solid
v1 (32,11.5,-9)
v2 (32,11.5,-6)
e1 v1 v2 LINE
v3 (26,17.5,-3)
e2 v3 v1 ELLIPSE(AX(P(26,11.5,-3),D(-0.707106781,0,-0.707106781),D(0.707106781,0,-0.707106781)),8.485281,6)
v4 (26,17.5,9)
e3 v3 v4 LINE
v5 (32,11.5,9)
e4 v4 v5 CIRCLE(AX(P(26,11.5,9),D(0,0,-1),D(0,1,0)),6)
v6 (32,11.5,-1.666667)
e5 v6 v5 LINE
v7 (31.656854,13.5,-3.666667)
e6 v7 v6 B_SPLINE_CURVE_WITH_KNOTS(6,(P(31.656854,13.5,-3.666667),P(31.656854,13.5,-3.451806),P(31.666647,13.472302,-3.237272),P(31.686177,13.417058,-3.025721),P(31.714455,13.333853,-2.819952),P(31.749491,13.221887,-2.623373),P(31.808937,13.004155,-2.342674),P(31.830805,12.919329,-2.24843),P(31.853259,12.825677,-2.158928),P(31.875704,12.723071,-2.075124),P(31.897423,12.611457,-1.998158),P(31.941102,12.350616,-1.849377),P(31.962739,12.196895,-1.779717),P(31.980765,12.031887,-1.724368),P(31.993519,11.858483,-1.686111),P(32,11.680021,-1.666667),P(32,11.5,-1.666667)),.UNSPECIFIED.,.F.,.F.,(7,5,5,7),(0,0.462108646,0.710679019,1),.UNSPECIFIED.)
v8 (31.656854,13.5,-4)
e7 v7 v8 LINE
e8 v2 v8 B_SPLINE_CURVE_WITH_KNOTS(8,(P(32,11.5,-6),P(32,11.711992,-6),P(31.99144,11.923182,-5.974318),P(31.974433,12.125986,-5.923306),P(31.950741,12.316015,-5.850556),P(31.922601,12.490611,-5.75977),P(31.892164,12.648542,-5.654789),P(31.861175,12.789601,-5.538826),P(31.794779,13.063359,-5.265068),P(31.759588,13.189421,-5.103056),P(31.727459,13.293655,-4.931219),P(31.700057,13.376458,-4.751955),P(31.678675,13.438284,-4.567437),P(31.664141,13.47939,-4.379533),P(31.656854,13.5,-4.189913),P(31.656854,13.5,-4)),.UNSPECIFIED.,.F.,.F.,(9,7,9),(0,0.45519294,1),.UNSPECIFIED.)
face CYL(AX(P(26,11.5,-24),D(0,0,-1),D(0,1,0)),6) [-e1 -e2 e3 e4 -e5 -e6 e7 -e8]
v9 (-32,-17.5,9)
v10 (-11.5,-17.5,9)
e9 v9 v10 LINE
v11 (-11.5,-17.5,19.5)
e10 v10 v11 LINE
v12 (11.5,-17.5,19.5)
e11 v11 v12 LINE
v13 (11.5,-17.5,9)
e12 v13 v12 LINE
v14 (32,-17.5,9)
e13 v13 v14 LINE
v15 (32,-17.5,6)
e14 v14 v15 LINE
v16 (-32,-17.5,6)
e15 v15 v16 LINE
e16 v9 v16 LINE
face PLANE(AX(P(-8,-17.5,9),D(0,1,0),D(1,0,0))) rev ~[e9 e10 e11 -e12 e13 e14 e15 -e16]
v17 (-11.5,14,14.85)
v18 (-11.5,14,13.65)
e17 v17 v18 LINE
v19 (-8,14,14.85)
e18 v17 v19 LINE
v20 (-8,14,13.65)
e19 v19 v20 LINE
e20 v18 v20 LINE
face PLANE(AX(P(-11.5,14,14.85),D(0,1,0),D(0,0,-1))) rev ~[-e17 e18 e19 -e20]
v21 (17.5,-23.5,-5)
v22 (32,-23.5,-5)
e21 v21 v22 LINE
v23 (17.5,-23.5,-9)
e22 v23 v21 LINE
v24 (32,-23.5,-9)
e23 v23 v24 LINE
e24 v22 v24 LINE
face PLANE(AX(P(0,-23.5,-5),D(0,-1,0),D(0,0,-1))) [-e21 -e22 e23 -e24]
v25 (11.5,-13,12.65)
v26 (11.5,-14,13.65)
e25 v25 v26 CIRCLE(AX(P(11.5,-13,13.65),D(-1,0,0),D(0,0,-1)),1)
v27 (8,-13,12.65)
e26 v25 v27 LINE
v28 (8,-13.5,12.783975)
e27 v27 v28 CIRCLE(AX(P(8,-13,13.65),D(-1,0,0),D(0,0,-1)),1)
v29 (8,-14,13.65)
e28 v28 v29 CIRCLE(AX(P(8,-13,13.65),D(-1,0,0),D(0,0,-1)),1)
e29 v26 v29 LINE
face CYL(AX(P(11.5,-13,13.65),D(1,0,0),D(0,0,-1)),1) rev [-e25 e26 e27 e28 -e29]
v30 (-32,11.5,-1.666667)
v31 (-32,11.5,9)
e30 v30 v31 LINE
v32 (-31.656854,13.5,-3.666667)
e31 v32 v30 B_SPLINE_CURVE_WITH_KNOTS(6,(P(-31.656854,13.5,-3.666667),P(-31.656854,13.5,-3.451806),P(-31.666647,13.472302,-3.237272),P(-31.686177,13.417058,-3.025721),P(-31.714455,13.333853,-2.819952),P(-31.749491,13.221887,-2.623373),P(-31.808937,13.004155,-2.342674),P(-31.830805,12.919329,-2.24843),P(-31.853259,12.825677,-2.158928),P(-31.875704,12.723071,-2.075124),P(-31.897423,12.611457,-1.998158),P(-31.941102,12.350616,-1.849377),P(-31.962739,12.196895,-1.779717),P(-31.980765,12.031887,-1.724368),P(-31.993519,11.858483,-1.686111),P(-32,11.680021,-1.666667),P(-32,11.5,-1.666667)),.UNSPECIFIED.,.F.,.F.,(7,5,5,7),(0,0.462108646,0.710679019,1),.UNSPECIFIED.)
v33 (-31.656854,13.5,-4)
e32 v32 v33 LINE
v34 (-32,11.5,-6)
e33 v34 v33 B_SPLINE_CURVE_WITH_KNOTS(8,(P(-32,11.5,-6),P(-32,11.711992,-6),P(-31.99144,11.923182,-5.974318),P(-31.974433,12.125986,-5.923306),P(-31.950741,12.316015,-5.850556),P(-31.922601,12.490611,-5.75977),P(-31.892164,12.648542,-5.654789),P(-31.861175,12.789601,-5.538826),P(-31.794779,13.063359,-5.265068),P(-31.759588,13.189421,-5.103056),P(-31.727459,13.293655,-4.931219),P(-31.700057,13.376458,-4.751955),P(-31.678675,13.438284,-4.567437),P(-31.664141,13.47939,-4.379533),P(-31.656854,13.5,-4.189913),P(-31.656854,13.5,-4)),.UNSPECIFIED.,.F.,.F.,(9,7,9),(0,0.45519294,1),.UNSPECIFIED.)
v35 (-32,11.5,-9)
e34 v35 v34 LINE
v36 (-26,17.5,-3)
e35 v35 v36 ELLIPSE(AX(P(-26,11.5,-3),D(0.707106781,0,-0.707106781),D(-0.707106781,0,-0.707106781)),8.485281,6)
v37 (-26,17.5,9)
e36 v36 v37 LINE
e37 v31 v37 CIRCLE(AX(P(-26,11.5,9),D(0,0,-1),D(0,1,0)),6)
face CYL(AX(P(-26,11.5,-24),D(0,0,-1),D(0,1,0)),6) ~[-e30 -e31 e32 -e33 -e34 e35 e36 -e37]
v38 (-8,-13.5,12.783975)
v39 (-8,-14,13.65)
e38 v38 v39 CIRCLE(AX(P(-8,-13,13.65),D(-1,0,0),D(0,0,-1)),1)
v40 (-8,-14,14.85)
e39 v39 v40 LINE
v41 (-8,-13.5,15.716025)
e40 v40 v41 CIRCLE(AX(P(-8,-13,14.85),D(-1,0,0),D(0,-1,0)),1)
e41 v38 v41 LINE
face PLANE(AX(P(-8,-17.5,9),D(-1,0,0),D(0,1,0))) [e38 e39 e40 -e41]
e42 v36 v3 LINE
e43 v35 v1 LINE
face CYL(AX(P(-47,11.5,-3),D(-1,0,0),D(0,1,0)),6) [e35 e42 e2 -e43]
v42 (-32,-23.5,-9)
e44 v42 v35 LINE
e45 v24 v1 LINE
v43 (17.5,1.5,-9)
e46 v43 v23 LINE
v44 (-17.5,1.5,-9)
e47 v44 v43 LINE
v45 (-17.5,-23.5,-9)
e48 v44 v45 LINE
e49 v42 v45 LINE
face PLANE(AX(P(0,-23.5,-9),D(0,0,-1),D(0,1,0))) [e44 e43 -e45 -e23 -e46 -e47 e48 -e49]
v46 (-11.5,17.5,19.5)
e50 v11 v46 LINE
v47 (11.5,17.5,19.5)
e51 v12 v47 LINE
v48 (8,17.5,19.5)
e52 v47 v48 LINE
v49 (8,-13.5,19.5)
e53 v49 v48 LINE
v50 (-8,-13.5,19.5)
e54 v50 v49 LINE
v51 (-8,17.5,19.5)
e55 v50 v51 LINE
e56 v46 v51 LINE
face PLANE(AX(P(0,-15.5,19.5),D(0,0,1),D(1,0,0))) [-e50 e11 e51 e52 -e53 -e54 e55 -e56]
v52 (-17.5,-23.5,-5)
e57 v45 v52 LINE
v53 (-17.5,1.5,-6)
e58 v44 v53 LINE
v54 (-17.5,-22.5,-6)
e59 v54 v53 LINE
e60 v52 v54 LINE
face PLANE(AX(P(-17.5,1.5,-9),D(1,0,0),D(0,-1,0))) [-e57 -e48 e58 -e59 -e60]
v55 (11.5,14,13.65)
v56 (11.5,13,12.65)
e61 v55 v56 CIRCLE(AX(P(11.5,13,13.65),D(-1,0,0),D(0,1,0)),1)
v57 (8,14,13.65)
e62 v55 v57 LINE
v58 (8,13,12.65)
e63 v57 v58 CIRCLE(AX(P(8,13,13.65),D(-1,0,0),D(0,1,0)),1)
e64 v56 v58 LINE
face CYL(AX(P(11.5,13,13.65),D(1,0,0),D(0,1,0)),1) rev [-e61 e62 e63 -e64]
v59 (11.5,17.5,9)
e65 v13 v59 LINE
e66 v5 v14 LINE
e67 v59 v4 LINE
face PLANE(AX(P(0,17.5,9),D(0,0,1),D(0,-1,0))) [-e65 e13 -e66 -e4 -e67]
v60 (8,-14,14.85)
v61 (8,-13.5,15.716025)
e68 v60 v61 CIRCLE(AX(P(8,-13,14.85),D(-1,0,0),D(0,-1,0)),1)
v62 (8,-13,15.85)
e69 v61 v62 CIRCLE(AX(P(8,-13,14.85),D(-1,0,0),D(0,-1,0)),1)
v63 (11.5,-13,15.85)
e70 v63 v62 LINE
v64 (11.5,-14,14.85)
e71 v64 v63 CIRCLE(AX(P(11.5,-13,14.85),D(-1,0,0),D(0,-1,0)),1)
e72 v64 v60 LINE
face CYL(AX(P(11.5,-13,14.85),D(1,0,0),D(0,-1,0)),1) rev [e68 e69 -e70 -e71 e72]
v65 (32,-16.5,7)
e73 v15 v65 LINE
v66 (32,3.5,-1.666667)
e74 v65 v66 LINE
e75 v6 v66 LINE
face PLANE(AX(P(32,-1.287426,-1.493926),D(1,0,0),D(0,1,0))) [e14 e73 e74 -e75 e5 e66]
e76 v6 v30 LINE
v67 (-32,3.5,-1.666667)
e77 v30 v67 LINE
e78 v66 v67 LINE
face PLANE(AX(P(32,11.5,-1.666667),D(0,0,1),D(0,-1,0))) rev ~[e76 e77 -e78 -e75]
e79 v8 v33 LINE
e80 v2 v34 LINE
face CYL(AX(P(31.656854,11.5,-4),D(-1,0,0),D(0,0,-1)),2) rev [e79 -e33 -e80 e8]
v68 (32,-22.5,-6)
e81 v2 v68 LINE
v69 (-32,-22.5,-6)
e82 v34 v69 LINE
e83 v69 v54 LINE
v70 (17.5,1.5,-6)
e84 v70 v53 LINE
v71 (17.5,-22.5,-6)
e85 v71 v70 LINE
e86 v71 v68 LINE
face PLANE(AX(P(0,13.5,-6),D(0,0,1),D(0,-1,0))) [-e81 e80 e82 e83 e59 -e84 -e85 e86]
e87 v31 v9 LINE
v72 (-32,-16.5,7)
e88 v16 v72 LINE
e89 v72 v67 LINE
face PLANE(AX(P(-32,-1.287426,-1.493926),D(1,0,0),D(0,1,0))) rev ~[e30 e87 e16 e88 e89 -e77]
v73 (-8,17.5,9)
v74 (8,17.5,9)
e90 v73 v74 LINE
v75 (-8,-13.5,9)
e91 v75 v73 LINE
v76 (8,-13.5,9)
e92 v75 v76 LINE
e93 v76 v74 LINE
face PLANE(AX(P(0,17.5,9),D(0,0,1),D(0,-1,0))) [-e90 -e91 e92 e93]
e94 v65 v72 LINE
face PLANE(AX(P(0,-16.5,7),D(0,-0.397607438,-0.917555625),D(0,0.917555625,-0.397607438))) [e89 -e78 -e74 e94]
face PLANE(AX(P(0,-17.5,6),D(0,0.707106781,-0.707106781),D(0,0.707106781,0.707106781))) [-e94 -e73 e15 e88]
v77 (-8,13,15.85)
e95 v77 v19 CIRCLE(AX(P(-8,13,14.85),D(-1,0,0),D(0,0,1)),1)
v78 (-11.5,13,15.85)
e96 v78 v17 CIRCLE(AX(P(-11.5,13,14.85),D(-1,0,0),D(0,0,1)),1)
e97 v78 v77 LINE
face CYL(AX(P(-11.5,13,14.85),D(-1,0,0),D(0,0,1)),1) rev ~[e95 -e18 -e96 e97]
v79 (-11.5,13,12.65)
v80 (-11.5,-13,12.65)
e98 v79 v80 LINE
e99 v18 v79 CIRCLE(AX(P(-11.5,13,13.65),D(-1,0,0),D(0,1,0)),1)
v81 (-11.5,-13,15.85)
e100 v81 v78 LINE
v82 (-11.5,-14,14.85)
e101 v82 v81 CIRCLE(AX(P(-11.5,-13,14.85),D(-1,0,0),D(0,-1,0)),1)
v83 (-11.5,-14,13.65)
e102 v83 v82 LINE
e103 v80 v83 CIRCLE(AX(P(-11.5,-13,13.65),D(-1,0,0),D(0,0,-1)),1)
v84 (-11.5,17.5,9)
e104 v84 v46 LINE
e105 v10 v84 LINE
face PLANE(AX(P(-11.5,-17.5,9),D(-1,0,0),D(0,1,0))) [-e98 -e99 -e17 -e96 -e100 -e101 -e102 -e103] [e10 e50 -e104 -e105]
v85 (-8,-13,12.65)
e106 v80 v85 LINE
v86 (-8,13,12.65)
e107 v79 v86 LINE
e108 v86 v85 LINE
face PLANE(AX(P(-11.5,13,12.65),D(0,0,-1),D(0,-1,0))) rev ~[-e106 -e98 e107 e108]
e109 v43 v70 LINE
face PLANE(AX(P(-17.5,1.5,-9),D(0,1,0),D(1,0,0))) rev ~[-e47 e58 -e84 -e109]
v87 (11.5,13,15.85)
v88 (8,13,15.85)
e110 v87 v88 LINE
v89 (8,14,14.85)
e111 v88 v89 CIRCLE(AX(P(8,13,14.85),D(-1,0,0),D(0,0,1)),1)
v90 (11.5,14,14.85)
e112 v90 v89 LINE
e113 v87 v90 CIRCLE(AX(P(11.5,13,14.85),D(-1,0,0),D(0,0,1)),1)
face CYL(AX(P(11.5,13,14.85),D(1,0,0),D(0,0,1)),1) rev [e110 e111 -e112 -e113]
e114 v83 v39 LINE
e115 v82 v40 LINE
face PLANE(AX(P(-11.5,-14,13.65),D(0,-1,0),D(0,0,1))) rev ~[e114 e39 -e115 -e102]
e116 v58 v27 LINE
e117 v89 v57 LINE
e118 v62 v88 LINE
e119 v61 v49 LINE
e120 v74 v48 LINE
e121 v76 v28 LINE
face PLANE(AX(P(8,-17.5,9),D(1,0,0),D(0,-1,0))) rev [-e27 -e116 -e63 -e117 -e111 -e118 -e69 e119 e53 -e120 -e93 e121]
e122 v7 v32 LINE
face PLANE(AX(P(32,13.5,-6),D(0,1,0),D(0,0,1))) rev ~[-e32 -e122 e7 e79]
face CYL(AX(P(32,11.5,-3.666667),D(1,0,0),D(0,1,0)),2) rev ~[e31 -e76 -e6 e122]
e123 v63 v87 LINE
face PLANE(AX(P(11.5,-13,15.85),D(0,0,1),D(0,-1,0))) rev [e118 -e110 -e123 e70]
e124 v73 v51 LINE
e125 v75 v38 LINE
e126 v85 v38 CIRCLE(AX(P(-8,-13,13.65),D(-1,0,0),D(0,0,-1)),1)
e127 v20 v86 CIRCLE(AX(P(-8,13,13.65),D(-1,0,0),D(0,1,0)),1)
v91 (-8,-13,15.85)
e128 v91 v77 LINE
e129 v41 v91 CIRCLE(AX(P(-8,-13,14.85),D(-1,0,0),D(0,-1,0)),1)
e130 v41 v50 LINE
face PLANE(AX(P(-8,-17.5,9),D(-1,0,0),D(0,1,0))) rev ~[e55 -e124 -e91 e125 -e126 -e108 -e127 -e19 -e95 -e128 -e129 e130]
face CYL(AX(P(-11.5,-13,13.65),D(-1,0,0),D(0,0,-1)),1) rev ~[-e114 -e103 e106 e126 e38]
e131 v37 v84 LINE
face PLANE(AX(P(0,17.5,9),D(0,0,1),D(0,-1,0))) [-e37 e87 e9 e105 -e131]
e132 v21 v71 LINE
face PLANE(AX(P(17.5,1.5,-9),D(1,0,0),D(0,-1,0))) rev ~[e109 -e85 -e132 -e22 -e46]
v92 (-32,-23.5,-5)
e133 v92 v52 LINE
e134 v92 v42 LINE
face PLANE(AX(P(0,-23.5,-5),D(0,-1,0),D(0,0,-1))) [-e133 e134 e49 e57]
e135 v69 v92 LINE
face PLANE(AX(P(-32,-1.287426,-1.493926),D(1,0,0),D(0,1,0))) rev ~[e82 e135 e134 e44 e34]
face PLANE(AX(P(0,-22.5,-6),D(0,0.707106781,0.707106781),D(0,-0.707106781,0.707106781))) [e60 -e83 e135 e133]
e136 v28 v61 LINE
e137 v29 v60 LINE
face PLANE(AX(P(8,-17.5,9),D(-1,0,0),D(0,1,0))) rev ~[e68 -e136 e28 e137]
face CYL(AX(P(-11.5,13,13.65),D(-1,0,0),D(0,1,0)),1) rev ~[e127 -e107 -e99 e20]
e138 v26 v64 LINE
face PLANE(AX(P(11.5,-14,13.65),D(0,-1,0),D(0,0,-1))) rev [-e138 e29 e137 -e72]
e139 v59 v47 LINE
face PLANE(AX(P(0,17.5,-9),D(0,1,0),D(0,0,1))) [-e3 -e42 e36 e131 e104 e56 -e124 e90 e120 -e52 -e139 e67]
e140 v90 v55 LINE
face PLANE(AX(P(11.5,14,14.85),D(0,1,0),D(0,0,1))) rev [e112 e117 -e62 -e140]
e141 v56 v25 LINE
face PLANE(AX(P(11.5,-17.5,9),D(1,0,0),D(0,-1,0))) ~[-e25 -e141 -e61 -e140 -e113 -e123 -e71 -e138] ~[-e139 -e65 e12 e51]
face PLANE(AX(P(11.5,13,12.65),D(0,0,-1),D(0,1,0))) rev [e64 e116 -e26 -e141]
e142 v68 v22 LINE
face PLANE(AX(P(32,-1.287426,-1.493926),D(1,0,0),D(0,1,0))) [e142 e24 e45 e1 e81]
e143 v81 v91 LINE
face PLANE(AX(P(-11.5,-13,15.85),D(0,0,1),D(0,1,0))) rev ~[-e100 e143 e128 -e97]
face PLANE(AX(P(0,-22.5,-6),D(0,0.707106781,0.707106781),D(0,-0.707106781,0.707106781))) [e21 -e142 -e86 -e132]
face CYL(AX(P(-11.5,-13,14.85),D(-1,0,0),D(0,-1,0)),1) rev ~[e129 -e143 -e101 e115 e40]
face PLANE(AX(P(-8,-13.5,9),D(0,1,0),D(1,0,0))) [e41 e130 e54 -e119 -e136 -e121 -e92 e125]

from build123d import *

# Parameters (mm, degrees)
F1_DEPTH     = 32
F3_DEPTH     = 64
F4_W         = 3.5
F4_H         = 35
F5_DEPTH     = 10.5
F7_DEPTH     = 3.5
F8_W         = 16
F8_H         = 4
F9_DEPTH     = 10.5
F10_T1_DEPTH = 48
F10_T3_DEPTH = 94
F11_W        = 35
F11_H        = 25
F12_DEPTH    = 4.001
F13_R        = 2


# Not quite as in the source:
# - a fillet or chamfer that OpenCascade refuses, or shapes differently, is made with other operations: its cross-section is extruded or revolved along the edge and cut away or added
# - a pattern or mirror of a feature is missing from the dataset's text; its kind, count and spacing are read off the source's solid


with BuildPart() as f1:
    # F0 (on Right) → F1 (new body, symmetric)
    with BuildSketch(Plane.YZ):
        Polygon((13.5, -6), (-22.5, -6), (-23.5, -5), (-23.5, -9), (17.5, -9), (17.5, 9), (-17.5, 9), (-17.5, 6), (-16.5, 7), align=None)
    extrude(amount=F1_DEPTH, both=True)

    # F2 (on face) → F3 (cut, through all)
    with BuildSketch(Plane.YZ.offset(32)):
        with BuildLine():
            Line((3.5, -1.6666666667), (13.5, -6))
            Line((13.5, -6), (13.5, -3.6666666667))
            ThreePointArc((13.5, -3.6666666667), (12.9142135624, -2.2524531043), (11.5, -1.6666666667))
            Line((11.5, -1.6666666667), (3.5, -1.6666666667))
        make_face()
    extrude(amount=-F3_DEPTH, mode=Mode.SUBTRACT)

    # F4 (on face) → F5 (join)
    with BuildSketch(Plane.XY.offset(9)):
        with Locations((-9.75, 0)):
            Rectangle(F4_W, F4_H)
    f5 = extrude(amount=F5_DEPTH)

    # F5_copies: F5 across plane
    add(f5.mirror(Plane(origin=(0, 0, 0), x_dir=(0, 0, 1), z_dir=(1, 0, 0))))

    # F6 (on face) → F7 (cut, through all)
    with BuildSketch(Plane(origin=(-11.5, 0, 0), x_dir=(0, -1, 0), z_dir=(-1, 0, 0))):
        with BuildLine():
            Line((13, 15.85), (-13, 15.85))
            ThreePointArc((-13, 15.85), (-13.7071067812, 15.5571067812), (-14, 14.85))
            Line((-14, 14.85), (-14, 13.65))
            ThreePointArc((-14, 13.65), (-13.7071067812, 12.9428932188), (-13, 12.65))
            Line((-13, 12.65), (13, 12.65))
            ThreePointArc((13, 12.65), (13.7071067812, 12.9428932188), (14, 13.65))
            Line((14, 13.65), (14, 14.85))
            ThreePointArc((14, 14.85), (13.7071067812, 15.5571067812), (13, 15.85))
        make_face()
    f7 = extrude(amount=-F7_DEPTH, mode=Mode.SUBTRACT)

    # F7_copies: F7 across plane
    add(f7.mirror(Plane(origin=(0, 0, 0), x_dir=(0, 0, 1), z_dir=(1, 0, 0))), mode=Mode.SUBTRACT)

    # F8 (on face) → F9 (join, through all)
    with BuildSketch(Plane.XY.offset(9)):
        with Locations((0, -15.5)):
            Rectangle(F8_W, F8_H)
    extrude(amount=F9_DEPTH)

    # F10: fillet of radius 6 on 3 edges, made by hand

    # F10_s2 → F10_t1 (cut)
    with BuildSketch(Plane.XY.offset(-24)):
        with BuildLine():
            ThreePointArc((26, 17.5), (30.2426406871, 15.7426406871), (32, 11.5))
            Line((32, 11.5), (32, 17.5))
            Line((32, 17.5), (26, 17.5))
        make_face()
        with BuildLine():
            ThreePointArc((-26, 17.5), (-30.2426406871, 15.7426406871), (-32, 11.5))
            Line((-32, 11.5), (-32, 17.5))
            Line((-32, 17.5), (-26, 17.5))
        make_face()
    extrude(amount=F10_T1_DEPTH, mode=Mode.SUBTRACT)

    # F10_s4 → F10_t3 (cut)
    with BuildSketch(Plane.YZ.offset(-47)):
        with BuildLine():
            ThreePointArc((17.5, -3), (15.7426406871, -7.2426406871), (11.5, -9))
            Line((11.5, -9), (17.5, -9))
            Line((17.5, -9), (17.5, -3))
        make_face()
    extrude(amount=F10_T3_DEPTH, mode=Mode.SUBTRACT)

    # F11 (on face) → F12 (cut, through all)
    with BuildSketch(Plane(origin=(0, 0, -9), x_dir=(1, 0, 0), z_dir=(0, 0, -1))):
        with Locations((0, 11)):
            Rectangle(F11_W, F11_H)
    extrude(amount=-F12_DEPTH, mode=Mode.SUBTRACT)

    # F13
    f13_edges = [f1.edges().sort_by_distance(p)[0] for p in [
        (0, 13.5, -6),
    ]]
    fillet(f13_edges, radius=F13_R)


solid = f1.part
